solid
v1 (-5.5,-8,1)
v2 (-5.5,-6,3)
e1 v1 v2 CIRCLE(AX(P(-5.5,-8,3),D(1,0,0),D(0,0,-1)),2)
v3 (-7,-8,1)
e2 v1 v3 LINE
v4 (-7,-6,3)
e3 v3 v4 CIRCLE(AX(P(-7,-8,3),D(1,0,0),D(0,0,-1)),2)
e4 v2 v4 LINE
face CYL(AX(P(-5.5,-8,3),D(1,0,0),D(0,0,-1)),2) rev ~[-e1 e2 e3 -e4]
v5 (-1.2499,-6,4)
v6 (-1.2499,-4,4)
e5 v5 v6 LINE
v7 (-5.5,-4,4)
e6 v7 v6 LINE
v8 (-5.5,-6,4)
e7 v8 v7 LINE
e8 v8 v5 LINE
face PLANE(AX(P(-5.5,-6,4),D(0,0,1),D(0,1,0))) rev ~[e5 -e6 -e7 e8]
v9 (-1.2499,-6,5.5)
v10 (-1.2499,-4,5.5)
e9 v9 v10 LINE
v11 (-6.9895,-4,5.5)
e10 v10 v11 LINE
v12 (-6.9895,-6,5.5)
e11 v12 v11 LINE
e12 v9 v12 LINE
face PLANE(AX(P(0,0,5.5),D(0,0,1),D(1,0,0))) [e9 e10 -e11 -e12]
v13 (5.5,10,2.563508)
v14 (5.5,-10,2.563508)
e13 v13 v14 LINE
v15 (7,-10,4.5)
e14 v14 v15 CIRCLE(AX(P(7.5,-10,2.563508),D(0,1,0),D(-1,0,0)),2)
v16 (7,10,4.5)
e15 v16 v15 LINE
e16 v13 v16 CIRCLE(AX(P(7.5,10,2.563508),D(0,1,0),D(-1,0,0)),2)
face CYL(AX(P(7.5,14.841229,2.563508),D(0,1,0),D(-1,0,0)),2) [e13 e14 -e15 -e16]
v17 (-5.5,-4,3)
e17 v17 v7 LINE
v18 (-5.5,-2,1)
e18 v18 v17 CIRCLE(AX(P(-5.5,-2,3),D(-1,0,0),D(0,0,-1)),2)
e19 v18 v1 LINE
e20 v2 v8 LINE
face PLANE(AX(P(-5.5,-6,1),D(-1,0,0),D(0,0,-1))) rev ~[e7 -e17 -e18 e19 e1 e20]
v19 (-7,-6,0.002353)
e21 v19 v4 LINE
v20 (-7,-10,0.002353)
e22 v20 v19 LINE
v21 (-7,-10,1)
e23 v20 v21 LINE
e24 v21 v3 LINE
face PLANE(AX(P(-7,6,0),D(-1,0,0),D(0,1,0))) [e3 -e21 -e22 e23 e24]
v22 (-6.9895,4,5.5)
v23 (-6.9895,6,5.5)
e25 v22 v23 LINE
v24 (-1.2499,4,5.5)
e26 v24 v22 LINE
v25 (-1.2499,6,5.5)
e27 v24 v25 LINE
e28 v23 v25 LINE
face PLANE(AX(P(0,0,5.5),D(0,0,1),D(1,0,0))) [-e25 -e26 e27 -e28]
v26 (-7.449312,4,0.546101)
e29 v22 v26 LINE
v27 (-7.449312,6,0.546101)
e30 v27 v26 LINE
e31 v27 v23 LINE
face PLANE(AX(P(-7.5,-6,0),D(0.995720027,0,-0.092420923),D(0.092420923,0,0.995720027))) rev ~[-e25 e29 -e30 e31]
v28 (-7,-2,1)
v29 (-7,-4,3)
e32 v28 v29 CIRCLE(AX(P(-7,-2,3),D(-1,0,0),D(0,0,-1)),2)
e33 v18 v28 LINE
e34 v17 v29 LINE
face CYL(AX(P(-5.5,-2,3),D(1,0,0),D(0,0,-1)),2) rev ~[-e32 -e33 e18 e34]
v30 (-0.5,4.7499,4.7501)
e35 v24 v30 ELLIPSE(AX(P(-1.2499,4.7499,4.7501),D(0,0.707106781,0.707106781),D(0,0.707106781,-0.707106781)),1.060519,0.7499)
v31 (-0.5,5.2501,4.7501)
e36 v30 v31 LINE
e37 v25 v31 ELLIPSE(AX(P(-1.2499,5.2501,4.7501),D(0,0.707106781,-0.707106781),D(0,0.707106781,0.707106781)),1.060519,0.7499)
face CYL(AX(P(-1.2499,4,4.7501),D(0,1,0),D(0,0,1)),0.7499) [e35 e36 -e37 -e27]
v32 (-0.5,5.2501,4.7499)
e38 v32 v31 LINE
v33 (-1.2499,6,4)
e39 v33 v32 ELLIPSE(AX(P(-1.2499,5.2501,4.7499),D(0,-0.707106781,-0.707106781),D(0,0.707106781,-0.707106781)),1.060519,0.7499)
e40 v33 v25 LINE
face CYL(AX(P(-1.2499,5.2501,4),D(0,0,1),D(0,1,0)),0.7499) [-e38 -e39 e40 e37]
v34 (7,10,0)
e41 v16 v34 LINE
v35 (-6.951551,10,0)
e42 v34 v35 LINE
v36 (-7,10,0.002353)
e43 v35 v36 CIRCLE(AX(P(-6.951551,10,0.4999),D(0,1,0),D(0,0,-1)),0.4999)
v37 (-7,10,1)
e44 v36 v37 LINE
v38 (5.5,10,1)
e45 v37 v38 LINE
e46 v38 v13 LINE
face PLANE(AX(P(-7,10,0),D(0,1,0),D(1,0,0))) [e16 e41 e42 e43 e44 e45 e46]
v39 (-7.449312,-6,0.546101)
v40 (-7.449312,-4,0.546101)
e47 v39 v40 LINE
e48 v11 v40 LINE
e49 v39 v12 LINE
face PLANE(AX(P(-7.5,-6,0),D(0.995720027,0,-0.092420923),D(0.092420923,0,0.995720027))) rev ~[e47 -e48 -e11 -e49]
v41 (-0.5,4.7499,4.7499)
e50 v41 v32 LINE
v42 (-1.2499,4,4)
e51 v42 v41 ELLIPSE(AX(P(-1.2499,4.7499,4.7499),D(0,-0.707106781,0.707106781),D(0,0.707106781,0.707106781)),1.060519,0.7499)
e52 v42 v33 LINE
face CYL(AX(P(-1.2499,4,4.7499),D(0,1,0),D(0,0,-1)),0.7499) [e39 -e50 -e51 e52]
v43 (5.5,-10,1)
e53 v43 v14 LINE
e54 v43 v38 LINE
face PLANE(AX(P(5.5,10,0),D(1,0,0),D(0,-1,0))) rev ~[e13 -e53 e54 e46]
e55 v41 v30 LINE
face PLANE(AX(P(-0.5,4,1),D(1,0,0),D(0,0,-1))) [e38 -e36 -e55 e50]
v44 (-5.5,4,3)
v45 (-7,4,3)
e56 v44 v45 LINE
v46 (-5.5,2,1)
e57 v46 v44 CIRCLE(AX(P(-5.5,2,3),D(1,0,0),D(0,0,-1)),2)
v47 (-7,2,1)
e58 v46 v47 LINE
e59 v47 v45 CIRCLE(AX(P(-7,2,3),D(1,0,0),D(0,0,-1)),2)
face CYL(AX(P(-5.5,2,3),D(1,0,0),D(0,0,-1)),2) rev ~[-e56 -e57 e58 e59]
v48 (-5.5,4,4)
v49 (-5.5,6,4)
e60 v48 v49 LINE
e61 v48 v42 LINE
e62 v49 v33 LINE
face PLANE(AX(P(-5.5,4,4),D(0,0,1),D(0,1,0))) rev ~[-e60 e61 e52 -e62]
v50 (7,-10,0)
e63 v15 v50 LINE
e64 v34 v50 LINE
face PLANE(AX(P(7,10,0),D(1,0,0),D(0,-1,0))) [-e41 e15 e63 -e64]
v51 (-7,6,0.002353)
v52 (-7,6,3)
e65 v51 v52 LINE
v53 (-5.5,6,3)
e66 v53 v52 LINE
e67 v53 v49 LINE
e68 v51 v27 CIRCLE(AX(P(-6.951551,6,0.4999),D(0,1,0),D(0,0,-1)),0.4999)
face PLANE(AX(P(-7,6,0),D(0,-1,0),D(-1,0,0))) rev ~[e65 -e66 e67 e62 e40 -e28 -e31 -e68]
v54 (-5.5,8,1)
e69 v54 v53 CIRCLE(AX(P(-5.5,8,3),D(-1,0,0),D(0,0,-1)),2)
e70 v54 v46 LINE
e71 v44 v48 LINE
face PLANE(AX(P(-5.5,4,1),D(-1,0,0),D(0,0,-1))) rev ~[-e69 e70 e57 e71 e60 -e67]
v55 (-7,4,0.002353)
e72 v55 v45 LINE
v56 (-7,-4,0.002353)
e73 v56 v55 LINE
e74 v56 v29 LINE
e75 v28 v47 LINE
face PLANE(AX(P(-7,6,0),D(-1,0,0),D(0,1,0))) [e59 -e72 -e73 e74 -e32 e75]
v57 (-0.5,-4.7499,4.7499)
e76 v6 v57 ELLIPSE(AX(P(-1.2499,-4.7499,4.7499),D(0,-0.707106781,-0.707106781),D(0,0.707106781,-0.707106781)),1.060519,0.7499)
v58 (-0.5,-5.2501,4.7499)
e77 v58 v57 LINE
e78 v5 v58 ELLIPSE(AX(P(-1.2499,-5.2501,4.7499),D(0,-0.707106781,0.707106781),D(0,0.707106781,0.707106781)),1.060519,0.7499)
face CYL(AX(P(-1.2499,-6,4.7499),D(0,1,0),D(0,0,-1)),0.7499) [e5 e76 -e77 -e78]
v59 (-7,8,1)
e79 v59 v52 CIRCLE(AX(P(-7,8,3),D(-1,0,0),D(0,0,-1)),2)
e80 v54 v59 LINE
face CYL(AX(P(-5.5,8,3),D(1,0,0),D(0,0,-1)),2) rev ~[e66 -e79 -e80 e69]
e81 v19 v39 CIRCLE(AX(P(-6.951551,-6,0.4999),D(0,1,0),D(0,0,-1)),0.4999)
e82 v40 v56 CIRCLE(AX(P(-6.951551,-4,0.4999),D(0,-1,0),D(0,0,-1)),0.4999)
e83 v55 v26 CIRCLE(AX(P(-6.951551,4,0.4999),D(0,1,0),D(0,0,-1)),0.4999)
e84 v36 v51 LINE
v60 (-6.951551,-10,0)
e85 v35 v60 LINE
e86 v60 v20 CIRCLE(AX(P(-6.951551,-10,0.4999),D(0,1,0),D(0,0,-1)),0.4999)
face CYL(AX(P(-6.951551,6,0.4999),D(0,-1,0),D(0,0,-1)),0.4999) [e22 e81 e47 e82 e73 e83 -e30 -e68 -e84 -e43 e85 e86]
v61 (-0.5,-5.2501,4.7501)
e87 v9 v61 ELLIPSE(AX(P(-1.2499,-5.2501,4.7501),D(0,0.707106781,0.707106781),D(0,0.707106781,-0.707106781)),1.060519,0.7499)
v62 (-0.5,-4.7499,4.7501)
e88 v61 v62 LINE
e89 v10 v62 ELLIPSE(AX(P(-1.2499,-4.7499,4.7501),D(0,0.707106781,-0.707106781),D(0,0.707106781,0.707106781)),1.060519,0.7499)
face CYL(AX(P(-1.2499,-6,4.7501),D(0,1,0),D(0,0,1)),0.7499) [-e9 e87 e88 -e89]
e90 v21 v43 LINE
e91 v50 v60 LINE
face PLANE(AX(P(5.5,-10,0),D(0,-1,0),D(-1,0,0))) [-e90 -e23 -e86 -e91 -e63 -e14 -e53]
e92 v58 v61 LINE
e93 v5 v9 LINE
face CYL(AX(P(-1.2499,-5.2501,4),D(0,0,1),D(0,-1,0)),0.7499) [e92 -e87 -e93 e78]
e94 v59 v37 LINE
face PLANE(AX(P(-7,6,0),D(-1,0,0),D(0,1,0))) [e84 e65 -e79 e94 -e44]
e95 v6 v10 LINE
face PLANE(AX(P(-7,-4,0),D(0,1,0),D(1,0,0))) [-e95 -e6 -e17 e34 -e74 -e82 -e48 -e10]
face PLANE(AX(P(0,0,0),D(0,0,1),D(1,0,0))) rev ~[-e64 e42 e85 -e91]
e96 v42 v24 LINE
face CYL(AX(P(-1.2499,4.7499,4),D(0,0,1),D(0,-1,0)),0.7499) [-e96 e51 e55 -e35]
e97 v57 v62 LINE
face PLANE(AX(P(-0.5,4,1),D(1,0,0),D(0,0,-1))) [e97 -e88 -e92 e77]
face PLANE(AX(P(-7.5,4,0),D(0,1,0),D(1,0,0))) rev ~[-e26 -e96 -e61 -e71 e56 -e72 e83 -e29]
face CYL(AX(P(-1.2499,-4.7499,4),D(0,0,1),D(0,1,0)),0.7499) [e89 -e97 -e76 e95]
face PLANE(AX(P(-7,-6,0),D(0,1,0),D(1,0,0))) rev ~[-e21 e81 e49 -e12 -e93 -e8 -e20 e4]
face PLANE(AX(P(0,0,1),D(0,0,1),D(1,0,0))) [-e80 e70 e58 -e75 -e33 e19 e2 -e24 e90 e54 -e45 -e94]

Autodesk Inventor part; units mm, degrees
ref_plane "YZ Plane" through (0, 0, 0) normal (1, 0, 0) x (0, 1, 0)
ref_plane "XZ Plane" through (0, 0, 0) normal (0, 1, 0) x (-1, 0, 0)
ref_plane "XY Plane" through (0, 0, 0) normal (0, 0, 1) x (1, 0, 0)
sketch "Schizzo1" plane through (0, 0, 0) normal (0, 0, 1) x (1, 0, 0)
  line L0 (-7, 10) -> (7, 10)
  line L1 (7, 10) -> (7, -10)
  line L2 (7, -10) -> (-7, -10)
  line L3 (-7, -10) -> (-7, 10)
  line L4 (-7, 10) -> (7, -10) construction
  line L5 (7, 10) -> (-7, -10) construction
  line L6 (-5.5, 10) -> (-5.5, -10)
  line L7 (5.5, 10) -> (5.5, -10)
  line L8 (-7, 6) -> (-5.5, 6)
  line L9 (-7, 4) -> (-5.5, 4)
  line L10 (-7, -4) -> (-5.5, -4)
  line L11 (-7, -6) -> (-5.5, -6)
  line L12 (-7, 6) -> (-7.5, 6)
  line L13 (-7.5, 6) -> (-7.5, 4)
  line L14 (-7.5, 4) -> (-7, 4)
  line L15 (-7, 4) -> (-7, 6)
  line L16 (-7, -4) -> (-7.5, -4)
  line L17 (-7.5, -4) -> (-7.5, -6)
  line L18 (-7.5, -6) -> (-7, -6)
  line L19 (-7, -6) -> (-7, -4)
  point P0 (0, 0)
  point P1 (0, 0)
  point P2 (-6.25, 4)
  point P3 (-6.25, -6)
  point P4 (-7, 5)
  dimension "d0" = 14
  dimension "d1" = 20
  dimension "d2" = 1.5
  dimension "d3" = 1.5
  dimension "d4" = 4
  dimension "d5" = 2
  dimension "d6" = 2
  dimension "d7" = 4
  dimension "d19" = 0.5
extrude "Estrusione1" add sketch "Schizzo1" along normal blind 1 contours L0 L6 L8 L3 | L0 L7 L2 L6 | L8 L6 L9 L3 | L0 L1 L2 L7 | L9 L6 L10 L3 | L10 L6 L11 L3 | L2 L3 L11 L6
extrude "Estrusione2" add sketch "Schizzo1" along normal blind 4.5 contours L0 L1 L2 L7
extrude "Estrusione3" add sketch "Schizzo1" along normal blind 5.5 contours L8 L6 L9 L3 | L10 L6 L11 L3
sketch "Schizzo2" plane through (-5.5, 4, 1) normal (1, 0, 0) x (0, 0, -1)
  line L0 (0, -10) -> (-4.5, -10) projected
  line L1 (-3, -10) -> (-3, -8)
  line L2 (0, -8) -> (-4.5, -8) projected
  line L3 (0, 0) -> (-4.5, 0) projected
  line L4 (-3, 0) -> (-3, 2)
  line L5 (0, 2) -> (-4.5, 2) projected
  line L6 (-4.5, -10) -> (-4.5, -8) projected
  line L7 (-3, 0) -> (-4.5, 0)
  line L8 (-4.5, 0) -> (-4.5, 2) projected
  line L9 (-4.5, 2) -> (-3, 2)
  point P0 (1, -4)
  dimension "d14" = 1.5
extrude "Estrusione4" add sketch "Schizzo2" along normal blind 5
fillet "Raccordo1" radius 2 5 edges at (-6.25, -6, 1) (-6.25, -4, 1) (-6.25, 4, 1) (-6.25, 6, 1) (5.5, 0, 4.5)
fillet "Raccordo2" radius 0.75 8 edges at (-0.5, 5, 5.5) (-0.5, 5, 4) (-0.5, -5, 5.5) (-0.5, -5, 4) (-0.5, -6, 4.75) (-0.5, -4, 4.75) (-0.5, 4, 4.75) (-0.5, 6, 4.75)
extrude "Estrusione5" add sketch "Schizzo1" along normal blind 5.5 contours L3 L14 L13 L12 | L3 L18 L17 L16
sketch "Schizzo3" plane through (-7, -6, 3) normal (0, -1, 0) x (1, 0, 0)
  line L0 (-0.5, 2.5) -> (5.75, 2.5) projected
  line L1 (0.0105, 2.5) -> (-0.5, 2.5)
  line L2 (-0.5, 2.5) -> (-0.5, -3)
  line L3 (-0.5, -3) -> (0.0105, 2.5)
  point P0 (7, -3)
  point P1 (0.0105, 2.5)
extrude "Estrusione6" cut sketch "Schizzo3" against normal blind 90
fillet "Raccordo3" radius 0.5 1 edges at (-7.5, 5, 0)
equation "\"d0\" = Larghezza"
equation "\"d1\" = Lunghezza"
equation "\"d2\" = Parete"
equation "\"d3\" = d2"
equation "\"d4\" = Gancio_bordo"
equation "\"d5\" = Gancio_larghezza_base"
equation "\"d6\" = d5"
equation "\"d7\" = d4"
equation "\"Lunghezza\" = 20"
equation "\"Larghezza\" = 14"
equation "\"Parete\" = 1.5"
equation "\"Gancio_gancio\" = 8"
equation "\"Gancio_bordo\" = 4"
equation "\"Gancio_larghezza_base\" = 2"
equation "\"Gancio_spessore\" = 1"
equation "\"Gancio_altezza\" = 5.5"
equation "\"Altezza_parete\" = 4.5"
equation "\"Spessore_base\" = 1"
equation "\"Gancio_larghezza\" = 1.5"
equation "\"Gancio_estrusione\" = 5"
properties part number "Supporto anello"
